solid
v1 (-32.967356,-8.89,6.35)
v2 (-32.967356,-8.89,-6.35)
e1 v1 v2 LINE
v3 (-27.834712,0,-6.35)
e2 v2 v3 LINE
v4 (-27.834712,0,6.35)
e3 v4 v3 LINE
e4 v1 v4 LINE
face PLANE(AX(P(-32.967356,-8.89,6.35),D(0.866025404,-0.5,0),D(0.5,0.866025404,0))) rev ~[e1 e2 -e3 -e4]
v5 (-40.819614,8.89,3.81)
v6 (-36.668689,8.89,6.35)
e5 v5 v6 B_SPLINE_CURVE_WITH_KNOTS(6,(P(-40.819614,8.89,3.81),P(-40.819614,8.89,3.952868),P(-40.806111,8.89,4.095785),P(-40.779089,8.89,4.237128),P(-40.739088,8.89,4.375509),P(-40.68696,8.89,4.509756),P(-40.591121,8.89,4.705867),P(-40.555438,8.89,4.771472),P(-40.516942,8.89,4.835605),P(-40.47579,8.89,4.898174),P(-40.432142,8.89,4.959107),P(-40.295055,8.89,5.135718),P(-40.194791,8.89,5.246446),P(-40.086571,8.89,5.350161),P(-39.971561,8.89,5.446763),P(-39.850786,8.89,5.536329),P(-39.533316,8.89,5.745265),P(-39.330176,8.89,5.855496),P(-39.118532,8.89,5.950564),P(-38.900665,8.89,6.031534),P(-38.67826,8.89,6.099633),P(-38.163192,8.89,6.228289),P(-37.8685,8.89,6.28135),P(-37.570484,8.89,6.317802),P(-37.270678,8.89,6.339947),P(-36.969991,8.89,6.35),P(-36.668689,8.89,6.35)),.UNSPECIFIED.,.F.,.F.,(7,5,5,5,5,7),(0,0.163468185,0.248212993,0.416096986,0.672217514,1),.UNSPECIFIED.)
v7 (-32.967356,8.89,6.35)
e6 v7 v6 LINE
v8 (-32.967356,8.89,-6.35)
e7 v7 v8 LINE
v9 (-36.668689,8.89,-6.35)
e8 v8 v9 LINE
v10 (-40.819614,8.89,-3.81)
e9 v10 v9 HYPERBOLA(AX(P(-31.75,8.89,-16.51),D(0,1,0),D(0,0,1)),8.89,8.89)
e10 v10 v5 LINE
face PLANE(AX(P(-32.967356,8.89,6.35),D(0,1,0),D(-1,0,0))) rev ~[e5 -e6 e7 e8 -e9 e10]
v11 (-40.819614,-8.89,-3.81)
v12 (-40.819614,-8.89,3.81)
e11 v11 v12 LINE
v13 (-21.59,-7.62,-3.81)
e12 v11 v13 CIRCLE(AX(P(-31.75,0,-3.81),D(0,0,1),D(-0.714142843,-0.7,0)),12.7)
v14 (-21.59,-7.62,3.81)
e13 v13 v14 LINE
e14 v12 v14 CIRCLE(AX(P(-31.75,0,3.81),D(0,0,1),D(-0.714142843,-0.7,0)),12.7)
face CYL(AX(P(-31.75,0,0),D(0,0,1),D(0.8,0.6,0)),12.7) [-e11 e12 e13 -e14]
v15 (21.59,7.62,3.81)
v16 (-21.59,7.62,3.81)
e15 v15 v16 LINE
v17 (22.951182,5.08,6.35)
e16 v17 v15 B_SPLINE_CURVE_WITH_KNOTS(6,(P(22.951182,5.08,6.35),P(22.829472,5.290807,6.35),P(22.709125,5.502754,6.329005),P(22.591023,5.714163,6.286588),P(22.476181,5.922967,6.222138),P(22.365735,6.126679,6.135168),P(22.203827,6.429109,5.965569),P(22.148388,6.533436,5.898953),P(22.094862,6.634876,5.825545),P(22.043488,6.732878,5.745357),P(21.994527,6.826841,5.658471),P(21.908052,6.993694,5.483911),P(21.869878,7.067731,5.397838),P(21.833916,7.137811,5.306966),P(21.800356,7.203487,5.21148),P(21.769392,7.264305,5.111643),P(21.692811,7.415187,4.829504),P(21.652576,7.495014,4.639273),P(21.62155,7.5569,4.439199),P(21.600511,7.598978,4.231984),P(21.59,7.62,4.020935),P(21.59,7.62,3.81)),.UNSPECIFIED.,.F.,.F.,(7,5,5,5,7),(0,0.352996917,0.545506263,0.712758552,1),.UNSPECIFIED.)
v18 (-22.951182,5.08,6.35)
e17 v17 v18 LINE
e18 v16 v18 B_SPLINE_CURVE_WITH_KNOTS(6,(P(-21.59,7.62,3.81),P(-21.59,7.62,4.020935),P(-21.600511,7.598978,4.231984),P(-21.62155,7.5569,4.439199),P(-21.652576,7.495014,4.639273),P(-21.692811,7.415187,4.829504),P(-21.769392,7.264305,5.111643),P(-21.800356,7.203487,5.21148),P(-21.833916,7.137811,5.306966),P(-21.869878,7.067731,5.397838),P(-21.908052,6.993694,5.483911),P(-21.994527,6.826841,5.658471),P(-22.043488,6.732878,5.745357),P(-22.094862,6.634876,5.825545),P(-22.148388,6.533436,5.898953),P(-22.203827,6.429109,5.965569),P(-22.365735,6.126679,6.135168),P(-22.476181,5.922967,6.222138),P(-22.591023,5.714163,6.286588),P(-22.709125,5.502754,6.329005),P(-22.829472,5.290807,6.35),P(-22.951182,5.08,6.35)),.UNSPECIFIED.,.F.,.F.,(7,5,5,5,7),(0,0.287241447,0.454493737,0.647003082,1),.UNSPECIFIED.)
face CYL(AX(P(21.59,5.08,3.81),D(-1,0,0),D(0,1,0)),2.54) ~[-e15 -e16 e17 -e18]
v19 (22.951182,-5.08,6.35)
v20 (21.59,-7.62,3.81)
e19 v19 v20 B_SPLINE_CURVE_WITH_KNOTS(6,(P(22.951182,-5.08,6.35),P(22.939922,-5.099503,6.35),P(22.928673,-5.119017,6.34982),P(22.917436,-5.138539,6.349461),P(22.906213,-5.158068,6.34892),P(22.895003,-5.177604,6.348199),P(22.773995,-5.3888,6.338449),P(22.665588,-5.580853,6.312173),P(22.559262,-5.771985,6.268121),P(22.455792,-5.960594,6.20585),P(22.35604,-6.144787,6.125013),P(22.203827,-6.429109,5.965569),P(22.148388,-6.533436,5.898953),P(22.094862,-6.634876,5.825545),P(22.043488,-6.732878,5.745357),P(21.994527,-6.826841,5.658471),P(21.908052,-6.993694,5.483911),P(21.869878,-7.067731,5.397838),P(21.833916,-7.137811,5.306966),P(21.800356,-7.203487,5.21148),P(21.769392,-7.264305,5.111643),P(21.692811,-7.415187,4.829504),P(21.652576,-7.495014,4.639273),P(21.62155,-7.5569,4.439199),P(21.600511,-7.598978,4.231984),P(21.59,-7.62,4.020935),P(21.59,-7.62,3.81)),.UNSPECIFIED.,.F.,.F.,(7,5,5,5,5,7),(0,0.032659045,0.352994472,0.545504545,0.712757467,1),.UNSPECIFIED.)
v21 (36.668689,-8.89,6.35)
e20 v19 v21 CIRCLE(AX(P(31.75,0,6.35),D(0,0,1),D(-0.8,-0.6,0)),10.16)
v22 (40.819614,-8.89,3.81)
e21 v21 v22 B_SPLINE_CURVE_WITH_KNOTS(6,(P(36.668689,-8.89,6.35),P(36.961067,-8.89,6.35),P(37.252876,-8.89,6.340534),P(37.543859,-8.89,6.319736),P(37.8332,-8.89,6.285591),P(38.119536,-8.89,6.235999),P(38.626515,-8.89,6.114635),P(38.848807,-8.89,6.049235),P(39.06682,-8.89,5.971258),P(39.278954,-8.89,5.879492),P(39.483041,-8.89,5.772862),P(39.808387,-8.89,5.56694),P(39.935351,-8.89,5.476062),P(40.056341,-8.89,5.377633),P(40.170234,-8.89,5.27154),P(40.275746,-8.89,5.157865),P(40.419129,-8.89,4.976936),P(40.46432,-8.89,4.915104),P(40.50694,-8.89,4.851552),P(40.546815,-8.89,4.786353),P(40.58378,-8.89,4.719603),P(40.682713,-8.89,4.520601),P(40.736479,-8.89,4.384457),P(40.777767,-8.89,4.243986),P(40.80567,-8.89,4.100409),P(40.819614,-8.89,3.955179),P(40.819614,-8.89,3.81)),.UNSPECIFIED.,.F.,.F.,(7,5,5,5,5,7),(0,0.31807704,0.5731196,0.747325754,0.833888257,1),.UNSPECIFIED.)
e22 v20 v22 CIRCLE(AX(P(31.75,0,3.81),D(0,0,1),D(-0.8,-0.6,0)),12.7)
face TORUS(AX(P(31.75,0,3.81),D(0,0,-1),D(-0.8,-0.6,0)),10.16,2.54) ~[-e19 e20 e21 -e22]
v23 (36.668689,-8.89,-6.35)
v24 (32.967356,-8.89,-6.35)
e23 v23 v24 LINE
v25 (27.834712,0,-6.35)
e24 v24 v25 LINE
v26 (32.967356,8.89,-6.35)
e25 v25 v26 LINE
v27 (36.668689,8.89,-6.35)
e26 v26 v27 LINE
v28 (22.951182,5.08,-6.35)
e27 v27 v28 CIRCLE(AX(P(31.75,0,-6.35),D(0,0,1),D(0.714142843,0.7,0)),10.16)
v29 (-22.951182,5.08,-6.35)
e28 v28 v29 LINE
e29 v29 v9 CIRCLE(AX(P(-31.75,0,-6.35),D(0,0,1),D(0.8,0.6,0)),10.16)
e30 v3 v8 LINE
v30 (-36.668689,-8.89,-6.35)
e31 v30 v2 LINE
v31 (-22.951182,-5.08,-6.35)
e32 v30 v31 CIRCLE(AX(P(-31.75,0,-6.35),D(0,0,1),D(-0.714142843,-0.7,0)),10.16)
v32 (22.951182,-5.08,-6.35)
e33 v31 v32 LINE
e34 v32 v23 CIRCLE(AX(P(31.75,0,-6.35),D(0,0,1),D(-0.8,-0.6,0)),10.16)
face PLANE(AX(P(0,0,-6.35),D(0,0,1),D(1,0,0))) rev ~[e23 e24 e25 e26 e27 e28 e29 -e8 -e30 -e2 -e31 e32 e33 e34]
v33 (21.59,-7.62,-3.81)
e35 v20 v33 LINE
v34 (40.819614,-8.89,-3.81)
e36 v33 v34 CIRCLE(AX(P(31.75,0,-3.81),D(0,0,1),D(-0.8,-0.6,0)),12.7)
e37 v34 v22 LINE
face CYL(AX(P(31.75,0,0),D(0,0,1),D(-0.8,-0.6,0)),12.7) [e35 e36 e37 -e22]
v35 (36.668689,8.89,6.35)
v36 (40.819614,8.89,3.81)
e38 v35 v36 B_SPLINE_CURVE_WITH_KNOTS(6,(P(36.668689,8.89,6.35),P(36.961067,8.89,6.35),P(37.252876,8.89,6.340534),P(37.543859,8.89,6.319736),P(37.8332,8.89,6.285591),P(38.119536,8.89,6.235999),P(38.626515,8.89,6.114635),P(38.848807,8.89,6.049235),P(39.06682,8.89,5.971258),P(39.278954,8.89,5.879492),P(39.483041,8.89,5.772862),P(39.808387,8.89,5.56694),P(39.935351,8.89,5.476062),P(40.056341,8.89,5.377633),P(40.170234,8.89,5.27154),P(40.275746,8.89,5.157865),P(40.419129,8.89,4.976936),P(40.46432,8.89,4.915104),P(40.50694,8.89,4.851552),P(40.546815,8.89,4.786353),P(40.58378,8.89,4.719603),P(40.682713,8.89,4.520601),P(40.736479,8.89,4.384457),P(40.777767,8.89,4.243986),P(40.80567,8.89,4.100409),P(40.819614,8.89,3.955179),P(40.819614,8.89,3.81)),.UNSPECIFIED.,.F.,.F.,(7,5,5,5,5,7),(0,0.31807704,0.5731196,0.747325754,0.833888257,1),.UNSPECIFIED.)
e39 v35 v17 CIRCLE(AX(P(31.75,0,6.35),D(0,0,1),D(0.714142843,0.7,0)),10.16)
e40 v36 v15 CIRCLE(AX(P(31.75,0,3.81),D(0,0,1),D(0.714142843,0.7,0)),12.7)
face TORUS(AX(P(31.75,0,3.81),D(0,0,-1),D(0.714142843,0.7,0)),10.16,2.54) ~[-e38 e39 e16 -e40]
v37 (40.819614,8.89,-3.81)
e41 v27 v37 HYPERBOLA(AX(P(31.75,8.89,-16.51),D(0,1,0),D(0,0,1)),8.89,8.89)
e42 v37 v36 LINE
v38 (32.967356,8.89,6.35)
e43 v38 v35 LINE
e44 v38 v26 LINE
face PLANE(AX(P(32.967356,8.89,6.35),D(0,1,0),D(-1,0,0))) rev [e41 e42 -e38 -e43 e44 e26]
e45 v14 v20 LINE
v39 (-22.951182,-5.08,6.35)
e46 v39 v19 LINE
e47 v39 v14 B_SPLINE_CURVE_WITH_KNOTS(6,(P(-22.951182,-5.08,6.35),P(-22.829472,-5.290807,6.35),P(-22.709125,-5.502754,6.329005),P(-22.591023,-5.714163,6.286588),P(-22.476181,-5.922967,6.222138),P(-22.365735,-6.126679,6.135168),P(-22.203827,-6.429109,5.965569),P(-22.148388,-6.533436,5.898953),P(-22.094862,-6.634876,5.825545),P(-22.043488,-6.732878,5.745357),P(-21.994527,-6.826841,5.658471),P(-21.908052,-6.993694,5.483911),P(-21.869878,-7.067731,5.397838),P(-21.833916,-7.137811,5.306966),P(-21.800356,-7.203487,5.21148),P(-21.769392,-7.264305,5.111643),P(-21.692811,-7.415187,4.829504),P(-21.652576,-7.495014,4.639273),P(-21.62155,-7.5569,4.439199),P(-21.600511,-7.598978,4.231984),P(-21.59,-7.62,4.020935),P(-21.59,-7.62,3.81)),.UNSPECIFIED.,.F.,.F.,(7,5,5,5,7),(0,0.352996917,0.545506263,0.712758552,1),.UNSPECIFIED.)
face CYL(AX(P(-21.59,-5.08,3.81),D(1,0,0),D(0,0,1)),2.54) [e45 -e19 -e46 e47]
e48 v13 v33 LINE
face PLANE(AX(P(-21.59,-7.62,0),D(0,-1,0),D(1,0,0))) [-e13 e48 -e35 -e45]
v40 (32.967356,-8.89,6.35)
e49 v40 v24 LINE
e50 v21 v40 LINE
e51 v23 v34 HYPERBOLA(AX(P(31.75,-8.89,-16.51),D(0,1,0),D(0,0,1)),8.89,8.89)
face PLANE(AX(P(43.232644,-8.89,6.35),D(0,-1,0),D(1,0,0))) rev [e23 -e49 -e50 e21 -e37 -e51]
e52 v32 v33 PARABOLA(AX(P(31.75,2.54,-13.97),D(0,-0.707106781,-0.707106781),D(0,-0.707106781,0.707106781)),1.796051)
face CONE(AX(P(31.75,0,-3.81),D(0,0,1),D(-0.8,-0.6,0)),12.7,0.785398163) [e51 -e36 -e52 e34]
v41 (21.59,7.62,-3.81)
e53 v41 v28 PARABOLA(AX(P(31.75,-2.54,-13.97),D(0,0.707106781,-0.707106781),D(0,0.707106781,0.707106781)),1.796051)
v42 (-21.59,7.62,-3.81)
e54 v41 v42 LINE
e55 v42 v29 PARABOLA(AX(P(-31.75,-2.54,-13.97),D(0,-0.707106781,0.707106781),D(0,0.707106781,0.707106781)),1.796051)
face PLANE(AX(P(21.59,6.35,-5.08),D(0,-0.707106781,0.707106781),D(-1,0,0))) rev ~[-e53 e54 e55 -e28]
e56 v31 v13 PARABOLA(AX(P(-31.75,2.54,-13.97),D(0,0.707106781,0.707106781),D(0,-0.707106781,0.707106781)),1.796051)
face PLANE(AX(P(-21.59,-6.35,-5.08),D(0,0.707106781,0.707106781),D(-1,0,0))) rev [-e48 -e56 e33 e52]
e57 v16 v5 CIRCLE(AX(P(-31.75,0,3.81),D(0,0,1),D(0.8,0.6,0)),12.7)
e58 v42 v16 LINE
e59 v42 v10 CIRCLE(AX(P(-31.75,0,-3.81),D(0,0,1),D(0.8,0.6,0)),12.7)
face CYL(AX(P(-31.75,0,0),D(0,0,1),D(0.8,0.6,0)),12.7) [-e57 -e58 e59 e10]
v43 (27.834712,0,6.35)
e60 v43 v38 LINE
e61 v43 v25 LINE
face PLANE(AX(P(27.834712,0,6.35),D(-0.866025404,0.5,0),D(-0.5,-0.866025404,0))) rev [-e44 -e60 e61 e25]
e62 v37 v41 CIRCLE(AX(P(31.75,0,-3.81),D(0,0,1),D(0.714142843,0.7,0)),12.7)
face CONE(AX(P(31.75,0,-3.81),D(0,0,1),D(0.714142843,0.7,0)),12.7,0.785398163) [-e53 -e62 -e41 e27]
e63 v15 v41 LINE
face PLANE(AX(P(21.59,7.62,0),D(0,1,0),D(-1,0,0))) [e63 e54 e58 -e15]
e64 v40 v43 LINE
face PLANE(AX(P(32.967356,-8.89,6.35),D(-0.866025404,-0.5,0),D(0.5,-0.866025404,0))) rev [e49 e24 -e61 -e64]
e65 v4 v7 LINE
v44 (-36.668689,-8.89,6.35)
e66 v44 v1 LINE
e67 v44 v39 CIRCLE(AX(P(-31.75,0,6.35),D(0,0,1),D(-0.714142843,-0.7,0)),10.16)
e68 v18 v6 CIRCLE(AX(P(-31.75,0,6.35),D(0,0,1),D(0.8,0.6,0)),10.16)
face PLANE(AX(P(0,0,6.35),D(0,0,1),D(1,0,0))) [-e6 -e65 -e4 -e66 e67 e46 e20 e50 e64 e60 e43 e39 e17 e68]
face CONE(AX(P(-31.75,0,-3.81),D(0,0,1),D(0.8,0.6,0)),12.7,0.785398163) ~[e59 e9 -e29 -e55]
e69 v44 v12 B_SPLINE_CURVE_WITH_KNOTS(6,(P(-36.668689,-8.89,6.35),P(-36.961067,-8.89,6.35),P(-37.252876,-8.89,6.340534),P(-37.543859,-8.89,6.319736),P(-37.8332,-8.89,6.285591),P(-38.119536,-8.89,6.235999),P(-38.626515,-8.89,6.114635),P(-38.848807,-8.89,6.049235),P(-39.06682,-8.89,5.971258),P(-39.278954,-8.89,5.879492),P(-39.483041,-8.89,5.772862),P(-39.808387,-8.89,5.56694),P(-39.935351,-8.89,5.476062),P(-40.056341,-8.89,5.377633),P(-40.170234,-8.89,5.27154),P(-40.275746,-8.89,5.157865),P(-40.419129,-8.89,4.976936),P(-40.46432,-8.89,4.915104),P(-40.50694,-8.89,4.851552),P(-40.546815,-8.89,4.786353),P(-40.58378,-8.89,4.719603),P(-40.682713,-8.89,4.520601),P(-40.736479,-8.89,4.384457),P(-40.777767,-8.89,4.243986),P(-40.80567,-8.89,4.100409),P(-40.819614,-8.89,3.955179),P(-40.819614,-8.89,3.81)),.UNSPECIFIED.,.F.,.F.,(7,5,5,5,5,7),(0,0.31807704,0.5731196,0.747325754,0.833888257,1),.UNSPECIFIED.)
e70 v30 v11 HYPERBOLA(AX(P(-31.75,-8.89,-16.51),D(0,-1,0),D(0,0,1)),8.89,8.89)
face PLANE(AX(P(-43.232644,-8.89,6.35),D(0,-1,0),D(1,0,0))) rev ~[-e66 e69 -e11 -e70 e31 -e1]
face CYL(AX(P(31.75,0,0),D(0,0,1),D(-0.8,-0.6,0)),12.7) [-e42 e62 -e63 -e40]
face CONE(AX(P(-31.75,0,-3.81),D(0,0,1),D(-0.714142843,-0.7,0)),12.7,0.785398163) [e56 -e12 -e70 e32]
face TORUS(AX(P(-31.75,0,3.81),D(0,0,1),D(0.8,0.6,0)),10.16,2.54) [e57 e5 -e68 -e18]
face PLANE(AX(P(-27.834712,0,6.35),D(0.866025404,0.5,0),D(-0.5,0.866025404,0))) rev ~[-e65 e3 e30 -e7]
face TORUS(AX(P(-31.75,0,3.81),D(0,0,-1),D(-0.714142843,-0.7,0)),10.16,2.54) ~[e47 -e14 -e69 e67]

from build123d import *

# Parameters (mm, degrees)
F1_DEPTH = 6.35
F3_DEPTH = 12.701
F6_R     = 2.54
F7_SIZE  = 2.54


with BuildPart() as f1:
    # F0 (on Top) → F1 (new body, symmetric)
    with BuildSketch(Plane.XY):
        with BuildLine():
            Line((21.59, 7.62), (-21.59, 7.62))
            ThreePointArc((-21.59, 7.62), (-44.45, 0), (-21.59, -7.62))
            Line((-21.59, -7.62), (21.59, -7.62))
            ThreePointArc((21.59, -7.62), (44.45, 0), (21.59, 7.62))
        make_face()
    extrude(amount=F1_DEPTH, both=True)

    # F4: F3 across plane


with BuildPart() as f3:
    # F2 (on face) → F3 (new body, through all)
    with BuildSketch(Plane.XY.offset(6.35)):
        Polygon((-43.2326438931, 8.89), (-48.3652877862, 0), (-43.2326438931, -8.89), (-32.9673561069, -8.89), (-27.8347122138, 0), (-32.9673561069, 8.89), align=None)
    extrude(amount=-F3_DEPTH)


with BuildPart() as f1_1:
    add(f1.part)
    add(f3.part.mirror(Plane.YZ), mode=Mode.SUBTRACT)

    # F5: cut F3
    add(f3.part, mode=Mode.SUBTRACT)

    # F6
    f6_edges = [f1_1.edges().sort_by_distance(p)[0] for p in [
        (-30.913065, -12.672393, 6.35),
        (0, -7.62, 6.35),
        (30.913065, -12.672393, 6.35),
        (30.913065, 12.672393, 6.35),
        (0, 7.62, 6.35),
        (-30.913065, 12.672393, 6.35),
    ]]
    fillet(f6_edges, radius=F6_R)

    # F7
    f7_edges = [f1_1.edges().sort_by_distance(p)[0] for p in [
        (-30.913065, 12.672393, -6.35),
        (0, 7.62, -6.35),
        (30.913065, 12.672393, -6.35),
        (30.913065, -12.672393, -6.35),
        (0, -7.62, -6.35),
        (-30.913065, -12.672393, -6.35),
    ]]
    chamfer(f7_edges, length=F7_SIZE)


solid = f1_1.part
